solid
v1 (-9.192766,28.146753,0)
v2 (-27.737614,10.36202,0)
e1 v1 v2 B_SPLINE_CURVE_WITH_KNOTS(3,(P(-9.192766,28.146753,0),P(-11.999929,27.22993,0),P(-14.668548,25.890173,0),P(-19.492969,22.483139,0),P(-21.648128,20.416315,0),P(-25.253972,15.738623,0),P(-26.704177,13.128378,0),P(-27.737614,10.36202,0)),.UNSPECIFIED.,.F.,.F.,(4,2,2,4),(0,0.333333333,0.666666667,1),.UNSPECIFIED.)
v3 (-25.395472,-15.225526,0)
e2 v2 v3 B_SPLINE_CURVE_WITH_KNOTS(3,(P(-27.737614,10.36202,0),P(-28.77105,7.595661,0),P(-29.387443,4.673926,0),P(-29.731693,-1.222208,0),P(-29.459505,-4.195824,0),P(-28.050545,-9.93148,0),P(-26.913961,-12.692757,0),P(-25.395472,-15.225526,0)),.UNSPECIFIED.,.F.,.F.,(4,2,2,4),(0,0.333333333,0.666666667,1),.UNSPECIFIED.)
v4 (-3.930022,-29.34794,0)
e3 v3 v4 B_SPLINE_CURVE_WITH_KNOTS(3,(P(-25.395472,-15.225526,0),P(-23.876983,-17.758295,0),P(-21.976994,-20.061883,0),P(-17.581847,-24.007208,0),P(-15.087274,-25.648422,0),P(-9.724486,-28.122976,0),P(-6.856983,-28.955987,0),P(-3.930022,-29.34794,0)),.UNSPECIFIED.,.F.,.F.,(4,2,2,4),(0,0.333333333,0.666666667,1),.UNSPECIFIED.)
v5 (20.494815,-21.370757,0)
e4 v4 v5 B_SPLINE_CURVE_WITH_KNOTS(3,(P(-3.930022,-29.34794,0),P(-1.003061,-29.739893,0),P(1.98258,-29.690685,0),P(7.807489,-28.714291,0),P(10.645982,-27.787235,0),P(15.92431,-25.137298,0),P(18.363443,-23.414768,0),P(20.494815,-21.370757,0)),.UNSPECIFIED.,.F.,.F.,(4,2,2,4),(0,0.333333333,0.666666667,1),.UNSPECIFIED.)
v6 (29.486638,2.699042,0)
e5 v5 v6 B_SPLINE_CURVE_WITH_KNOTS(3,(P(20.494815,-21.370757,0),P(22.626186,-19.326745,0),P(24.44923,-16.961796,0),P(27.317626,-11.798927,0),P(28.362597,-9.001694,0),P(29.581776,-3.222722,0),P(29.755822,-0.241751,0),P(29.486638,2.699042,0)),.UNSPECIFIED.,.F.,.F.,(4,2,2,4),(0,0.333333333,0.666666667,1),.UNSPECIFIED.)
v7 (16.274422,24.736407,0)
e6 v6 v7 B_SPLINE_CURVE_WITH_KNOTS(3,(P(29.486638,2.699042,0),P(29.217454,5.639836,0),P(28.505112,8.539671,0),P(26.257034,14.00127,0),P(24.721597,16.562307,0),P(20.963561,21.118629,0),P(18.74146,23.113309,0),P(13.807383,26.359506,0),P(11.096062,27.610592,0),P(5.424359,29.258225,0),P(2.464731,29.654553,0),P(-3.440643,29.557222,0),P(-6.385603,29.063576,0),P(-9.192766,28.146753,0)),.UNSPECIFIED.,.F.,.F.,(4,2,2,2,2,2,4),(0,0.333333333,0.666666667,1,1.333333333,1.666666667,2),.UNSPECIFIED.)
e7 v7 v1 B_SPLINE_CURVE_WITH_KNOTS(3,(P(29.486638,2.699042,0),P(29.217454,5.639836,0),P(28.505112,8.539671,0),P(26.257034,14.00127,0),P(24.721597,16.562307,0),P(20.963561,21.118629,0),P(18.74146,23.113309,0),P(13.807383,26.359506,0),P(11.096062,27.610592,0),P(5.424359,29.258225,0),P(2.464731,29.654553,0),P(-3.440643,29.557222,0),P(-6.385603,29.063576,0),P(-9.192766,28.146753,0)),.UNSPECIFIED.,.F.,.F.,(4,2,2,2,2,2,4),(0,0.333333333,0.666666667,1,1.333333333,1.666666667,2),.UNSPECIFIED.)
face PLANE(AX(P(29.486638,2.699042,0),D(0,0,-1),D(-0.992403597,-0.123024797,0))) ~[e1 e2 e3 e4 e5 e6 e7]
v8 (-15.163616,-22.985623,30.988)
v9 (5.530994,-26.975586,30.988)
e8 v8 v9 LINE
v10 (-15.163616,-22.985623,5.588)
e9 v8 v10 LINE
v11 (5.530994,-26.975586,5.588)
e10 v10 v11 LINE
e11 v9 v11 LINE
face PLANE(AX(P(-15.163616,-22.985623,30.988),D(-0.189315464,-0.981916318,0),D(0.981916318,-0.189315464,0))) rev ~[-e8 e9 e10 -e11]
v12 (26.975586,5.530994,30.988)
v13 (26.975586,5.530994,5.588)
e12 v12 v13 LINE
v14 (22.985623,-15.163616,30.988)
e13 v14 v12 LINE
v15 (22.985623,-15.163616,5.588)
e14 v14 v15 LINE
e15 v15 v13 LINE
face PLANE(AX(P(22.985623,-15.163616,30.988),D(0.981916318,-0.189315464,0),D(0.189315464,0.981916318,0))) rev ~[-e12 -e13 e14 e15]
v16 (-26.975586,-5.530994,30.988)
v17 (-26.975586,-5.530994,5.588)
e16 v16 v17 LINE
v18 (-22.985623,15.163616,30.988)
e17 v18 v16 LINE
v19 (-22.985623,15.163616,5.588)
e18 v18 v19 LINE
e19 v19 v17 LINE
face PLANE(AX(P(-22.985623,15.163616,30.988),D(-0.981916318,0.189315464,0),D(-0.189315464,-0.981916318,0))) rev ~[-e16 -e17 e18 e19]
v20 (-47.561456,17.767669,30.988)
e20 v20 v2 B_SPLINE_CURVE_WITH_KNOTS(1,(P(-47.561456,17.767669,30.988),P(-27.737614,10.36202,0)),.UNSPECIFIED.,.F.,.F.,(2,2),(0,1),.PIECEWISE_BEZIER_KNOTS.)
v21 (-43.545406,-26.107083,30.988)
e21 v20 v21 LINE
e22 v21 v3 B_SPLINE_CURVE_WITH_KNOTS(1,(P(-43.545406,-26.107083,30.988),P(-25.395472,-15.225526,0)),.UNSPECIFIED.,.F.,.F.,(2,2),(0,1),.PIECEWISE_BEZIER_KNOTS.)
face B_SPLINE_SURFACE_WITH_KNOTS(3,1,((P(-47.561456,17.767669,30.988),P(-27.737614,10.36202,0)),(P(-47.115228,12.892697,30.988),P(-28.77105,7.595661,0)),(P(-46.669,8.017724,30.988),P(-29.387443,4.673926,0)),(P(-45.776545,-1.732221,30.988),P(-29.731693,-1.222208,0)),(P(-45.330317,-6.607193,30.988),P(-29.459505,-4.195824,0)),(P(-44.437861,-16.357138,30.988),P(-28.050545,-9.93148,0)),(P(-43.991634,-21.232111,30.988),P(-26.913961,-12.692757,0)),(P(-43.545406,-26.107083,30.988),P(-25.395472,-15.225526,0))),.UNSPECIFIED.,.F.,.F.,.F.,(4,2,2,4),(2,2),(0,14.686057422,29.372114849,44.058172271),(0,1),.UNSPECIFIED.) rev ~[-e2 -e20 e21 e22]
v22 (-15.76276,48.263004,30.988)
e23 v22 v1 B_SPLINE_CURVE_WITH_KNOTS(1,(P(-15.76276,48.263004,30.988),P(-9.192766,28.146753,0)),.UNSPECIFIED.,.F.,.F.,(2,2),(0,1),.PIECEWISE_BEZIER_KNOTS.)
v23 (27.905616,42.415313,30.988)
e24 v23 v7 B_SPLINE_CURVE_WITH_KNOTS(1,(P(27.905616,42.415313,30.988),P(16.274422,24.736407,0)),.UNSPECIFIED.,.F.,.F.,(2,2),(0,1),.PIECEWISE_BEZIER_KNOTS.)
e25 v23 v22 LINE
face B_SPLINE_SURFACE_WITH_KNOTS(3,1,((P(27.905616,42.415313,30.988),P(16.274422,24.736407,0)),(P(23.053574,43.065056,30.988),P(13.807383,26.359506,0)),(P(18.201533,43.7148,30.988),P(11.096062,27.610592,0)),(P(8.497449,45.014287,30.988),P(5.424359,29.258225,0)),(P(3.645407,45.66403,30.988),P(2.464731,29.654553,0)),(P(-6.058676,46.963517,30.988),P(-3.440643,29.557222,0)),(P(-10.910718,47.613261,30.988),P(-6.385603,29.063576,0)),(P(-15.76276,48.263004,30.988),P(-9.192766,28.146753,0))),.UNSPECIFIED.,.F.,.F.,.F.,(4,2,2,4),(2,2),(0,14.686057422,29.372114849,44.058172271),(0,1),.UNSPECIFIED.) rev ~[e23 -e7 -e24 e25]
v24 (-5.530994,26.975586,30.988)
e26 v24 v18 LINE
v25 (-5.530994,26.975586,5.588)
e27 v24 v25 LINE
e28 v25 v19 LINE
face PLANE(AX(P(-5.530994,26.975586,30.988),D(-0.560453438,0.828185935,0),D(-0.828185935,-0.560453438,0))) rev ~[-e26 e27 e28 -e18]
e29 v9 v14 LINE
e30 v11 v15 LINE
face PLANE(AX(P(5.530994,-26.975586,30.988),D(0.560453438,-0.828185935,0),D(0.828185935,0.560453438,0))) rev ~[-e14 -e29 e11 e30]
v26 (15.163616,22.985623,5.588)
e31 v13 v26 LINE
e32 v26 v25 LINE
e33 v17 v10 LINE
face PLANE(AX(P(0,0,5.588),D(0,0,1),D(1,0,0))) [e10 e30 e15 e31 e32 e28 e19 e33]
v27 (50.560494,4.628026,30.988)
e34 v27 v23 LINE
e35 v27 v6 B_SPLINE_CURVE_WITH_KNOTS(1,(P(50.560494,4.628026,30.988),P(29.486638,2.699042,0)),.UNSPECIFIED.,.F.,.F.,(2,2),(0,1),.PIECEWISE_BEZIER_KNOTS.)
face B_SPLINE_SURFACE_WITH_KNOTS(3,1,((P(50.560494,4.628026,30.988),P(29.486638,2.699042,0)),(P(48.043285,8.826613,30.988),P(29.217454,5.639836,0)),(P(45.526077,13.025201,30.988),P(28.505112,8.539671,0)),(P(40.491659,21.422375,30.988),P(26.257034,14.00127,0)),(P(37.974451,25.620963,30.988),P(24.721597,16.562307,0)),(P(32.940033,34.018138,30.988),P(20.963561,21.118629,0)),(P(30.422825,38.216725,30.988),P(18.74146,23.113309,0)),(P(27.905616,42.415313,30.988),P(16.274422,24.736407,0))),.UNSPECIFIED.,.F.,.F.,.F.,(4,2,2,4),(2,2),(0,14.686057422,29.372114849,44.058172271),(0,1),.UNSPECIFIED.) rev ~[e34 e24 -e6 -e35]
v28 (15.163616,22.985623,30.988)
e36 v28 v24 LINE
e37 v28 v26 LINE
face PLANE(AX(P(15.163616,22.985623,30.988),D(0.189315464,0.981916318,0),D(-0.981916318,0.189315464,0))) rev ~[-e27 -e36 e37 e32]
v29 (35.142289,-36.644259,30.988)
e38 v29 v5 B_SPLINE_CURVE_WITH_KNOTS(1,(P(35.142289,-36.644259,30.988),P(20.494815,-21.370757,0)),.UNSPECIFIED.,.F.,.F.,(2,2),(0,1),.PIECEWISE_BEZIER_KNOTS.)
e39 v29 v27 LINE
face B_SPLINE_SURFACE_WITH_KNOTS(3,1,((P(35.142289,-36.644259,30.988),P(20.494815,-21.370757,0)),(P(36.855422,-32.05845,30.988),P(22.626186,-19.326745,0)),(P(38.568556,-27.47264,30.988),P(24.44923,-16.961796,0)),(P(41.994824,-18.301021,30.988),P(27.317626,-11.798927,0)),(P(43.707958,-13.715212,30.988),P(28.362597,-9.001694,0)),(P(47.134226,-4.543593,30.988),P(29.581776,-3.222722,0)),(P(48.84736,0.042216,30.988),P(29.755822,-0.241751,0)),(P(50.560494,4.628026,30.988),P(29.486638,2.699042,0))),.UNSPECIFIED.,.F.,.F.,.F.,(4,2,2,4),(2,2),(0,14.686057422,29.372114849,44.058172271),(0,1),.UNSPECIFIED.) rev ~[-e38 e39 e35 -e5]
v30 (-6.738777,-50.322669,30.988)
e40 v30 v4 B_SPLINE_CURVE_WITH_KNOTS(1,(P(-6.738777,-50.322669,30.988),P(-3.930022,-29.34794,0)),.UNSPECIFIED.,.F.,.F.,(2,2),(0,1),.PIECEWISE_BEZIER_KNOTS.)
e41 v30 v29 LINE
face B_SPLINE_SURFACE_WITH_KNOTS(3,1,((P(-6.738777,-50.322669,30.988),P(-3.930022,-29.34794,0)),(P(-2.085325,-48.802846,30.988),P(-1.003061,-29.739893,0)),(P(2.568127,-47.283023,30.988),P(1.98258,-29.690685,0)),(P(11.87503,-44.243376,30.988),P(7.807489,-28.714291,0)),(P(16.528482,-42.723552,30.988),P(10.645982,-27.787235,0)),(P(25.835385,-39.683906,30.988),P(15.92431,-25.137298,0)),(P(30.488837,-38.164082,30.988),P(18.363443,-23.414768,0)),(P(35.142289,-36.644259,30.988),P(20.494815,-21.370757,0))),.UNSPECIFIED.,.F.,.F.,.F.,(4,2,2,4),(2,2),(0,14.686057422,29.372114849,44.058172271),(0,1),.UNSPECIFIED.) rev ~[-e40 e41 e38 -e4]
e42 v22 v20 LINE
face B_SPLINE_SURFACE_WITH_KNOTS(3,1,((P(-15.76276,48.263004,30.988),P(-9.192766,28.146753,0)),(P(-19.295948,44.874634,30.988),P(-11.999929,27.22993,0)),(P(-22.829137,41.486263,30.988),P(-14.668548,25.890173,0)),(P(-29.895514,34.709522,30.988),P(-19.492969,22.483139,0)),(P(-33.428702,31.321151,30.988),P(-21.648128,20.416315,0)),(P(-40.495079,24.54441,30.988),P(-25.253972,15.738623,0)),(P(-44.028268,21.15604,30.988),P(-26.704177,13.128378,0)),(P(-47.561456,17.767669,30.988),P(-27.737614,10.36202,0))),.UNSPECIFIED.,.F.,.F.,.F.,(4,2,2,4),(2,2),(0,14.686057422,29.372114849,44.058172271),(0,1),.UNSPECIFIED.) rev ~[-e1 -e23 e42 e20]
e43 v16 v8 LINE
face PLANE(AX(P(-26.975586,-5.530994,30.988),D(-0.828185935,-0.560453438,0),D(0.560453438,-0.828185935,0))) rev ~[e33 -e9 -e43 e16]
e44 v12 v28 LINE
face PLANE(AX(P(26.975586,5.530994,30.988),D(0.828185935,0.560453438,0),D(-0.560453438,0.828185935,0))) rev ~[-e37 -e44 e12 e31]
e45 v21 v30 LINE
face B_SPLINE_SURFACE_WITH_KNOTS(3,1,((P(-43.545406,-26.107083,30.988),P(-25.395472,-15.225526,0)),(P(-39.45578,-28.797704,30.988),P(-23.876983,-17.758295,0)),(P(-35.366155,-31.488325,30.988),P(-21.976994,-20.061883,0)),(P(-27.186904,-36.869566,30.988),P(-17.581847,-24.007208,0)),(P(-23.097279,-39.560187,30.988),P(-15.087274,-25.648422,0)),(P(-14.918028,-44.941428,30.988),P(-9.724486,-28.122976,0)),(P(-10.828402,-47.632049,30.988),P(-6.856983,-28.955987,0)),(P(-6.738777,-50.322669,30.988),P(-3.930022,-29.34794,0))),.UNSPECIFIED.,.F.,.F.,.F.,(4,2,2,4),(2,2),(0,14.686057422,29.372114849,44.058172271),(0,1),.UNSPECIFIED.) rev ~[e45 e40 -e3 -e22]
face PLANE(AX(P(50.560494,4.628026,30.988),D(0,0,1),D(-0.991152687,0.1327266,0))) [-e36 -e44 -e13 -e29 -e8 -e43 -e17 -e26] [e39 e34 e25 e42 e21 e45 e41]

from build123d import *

# Parameters (mm, degrees)
F5_DEPTH = 25.4


# Not quite as in the source:
# - the arcs of a loft's sections are written as splines that run evenly, so that the points pair up as in the source's solid


with BuildPart() as f3:
    # F2 (on offset) → F3 section 0
    with BuildSketch(Plane.XY.offset(30.988)):
        Polygon((50.5604938488, 4.6280257192), (27.9056160827, 42.4153126988), (-15.7627597645, 48.2630041015), (-47.5614560073, 17.7676690299), (-43.5454057997, -26.1070832156), (-6.7387768606, -50.3226693123), (35.1422885006, -36.6442590214), align=None)
    # F0 (on Top) → F3 section 1
    with BuildSketch(Plane.XY):
        with BuildLine():
            add(Edge.make_bspline(
                [(29.4866381099, 2.699042457), (29.2174542384, 5.6398362877), (28.5051117676, 8.5396714595), (26.2570337959, 14.0012700055), (24.7215972806, 16.5623070077), (20.9635606735, 21.1186294397), (18.7414603862, 23.1133088958), (16.2744217872, 24.7364074332)],
                knots=[0, 0, 0, 0, 0.3333333333, 0.3333333333, 0.6666666667, 0.6666666667, 1, 1, 1, 1], degree=3))
            add(Edge.make_bspline(
                [(16.2744217872, 24.7364074332), (13.8073831882, 26.3595059706), (11.096062491, 27.6105918574), (5.424359114, 29.2582247193), (2.4647307492, 29.6545525654), (-3.440643072, 29.557221804), (-6.385603136, 29.0635761411), (-9.192766079, 28.1467530815)],
                knots=[0, 0, 0, 0, 0.3333333333, 0.3333333333, 0.6666666667, 0.6666666667, 1, 1, 1, 1], degree=3))
            add(Edge.make_bspline(
                [(-9.192766079, 28.1467530815), (-11.9999290219, 27.2299300218), (-14.6685481598, 25.8901734333), (-19.4929686175, 22.4831394605), (-21.6481283077, 20.4163151987), (-25.2539724079, 15.7386232925), (-26.7041772543, 13.1283777633), (-27.7376135895, 10.3620195702)],
                knots=[0, 0, 0, 0, 0.3333333333, 0.3333333333, 0.6666666667, 0.6666666667, 1, 1, 1, 1], degree=3))
            add(Edge.make_bspline(
                [(-27.7376135895, 10.3620195702), (-28.7710499246, 7.5956613772), (-29.3874428624, 4.6739263506), (-29.7316933959, -1.2222083845), (-29.4595052076, -4.1958239296), (-28.0505454335, -9.9314795677), (-26.9139612341, -12.6927568405), (-25.3954723229, -15.2255260241)],
                knots=[0, 0, 0, 0, 0.3333333333, 0.3333333333, 0.6666666667, 0.6666666667, 1, 1, 1, 1], degree=3))
            add(Edge.make_bspline(
                [(-25.3954723229, -15.2255260241), (-23.8769834116, -17.7582952077), (-21.976993695, -20.0618826048), (-17.5818466312, -24.0072083875), (-15.0872738217, -25.6484220597), (-9.7244856209, -28.1229757482), (-6.8569834599, -28.9559866583), (-3.9300224239, -29.3479399781)],
                knots=[0, 0, 0, 0, 0.3333333333, 0.3333333333, 0.6666666667, 0.6666666667, 1, 1, 1, 1], degree=3))
            add(Edge.make_bspline(
                [(-3.9300224239, -29.3479399781), (-1.003061388, -29.739893298), (1.9825799737, -29.690684771), (7.8074892511, -28.7142908169), (10.6459824762, -27.7872352464), (15.9243102077, -25.1372975861), (18.3634427166, -23.4147679279), (20.4948145181, -21.3707565397)],
                knots=[0, 0, 0, 0, 0.3333333333, 0.3333333333, 0.6666666667, 0.6666666667, 1, 1, 1, 1], degree=3))
            add(Edge.make_bspline(
                [(20.4948145181, -21.3707565397), (22.6261863196, -19.3267451516), (24.449230485, -16.961795725), (27.3176264836, -11.7989265964), (28.3625968311, -9.0016935363), (29.5817756531, -3.2227216343), (29.7558219815, -0.2417513736), (29.4866381099, 2.699042457)],
                knots=[0, 0, 0, 0, 0.3333333333, 0.3333333333, 0.6666666667, 0.6666666667, 1, 1, 1, 1], degree=3))
        make_face()
    loft(ruled=True)

    # F4 (on face) → F5 (cut)
    with BuildSketch(Plane.XY.offset(30.988)):
        Polygon((26.9755858675, 5.5309937743), (15.1636164888, 22.9856228979), (-5.5309937743, 26.9755858675), (-22.9856228979, 15.1636164888), (-26.9755858675, -5.5309937743), (-15.1636164888, -22.9856228979), (5.5309937743, -26.9755858675), (22.9856228979, -15.1636164888), align=None)
    extrude(amount=-F5_DEPTH, mode=Mode.SUBTRACT)


solid = f3.part
